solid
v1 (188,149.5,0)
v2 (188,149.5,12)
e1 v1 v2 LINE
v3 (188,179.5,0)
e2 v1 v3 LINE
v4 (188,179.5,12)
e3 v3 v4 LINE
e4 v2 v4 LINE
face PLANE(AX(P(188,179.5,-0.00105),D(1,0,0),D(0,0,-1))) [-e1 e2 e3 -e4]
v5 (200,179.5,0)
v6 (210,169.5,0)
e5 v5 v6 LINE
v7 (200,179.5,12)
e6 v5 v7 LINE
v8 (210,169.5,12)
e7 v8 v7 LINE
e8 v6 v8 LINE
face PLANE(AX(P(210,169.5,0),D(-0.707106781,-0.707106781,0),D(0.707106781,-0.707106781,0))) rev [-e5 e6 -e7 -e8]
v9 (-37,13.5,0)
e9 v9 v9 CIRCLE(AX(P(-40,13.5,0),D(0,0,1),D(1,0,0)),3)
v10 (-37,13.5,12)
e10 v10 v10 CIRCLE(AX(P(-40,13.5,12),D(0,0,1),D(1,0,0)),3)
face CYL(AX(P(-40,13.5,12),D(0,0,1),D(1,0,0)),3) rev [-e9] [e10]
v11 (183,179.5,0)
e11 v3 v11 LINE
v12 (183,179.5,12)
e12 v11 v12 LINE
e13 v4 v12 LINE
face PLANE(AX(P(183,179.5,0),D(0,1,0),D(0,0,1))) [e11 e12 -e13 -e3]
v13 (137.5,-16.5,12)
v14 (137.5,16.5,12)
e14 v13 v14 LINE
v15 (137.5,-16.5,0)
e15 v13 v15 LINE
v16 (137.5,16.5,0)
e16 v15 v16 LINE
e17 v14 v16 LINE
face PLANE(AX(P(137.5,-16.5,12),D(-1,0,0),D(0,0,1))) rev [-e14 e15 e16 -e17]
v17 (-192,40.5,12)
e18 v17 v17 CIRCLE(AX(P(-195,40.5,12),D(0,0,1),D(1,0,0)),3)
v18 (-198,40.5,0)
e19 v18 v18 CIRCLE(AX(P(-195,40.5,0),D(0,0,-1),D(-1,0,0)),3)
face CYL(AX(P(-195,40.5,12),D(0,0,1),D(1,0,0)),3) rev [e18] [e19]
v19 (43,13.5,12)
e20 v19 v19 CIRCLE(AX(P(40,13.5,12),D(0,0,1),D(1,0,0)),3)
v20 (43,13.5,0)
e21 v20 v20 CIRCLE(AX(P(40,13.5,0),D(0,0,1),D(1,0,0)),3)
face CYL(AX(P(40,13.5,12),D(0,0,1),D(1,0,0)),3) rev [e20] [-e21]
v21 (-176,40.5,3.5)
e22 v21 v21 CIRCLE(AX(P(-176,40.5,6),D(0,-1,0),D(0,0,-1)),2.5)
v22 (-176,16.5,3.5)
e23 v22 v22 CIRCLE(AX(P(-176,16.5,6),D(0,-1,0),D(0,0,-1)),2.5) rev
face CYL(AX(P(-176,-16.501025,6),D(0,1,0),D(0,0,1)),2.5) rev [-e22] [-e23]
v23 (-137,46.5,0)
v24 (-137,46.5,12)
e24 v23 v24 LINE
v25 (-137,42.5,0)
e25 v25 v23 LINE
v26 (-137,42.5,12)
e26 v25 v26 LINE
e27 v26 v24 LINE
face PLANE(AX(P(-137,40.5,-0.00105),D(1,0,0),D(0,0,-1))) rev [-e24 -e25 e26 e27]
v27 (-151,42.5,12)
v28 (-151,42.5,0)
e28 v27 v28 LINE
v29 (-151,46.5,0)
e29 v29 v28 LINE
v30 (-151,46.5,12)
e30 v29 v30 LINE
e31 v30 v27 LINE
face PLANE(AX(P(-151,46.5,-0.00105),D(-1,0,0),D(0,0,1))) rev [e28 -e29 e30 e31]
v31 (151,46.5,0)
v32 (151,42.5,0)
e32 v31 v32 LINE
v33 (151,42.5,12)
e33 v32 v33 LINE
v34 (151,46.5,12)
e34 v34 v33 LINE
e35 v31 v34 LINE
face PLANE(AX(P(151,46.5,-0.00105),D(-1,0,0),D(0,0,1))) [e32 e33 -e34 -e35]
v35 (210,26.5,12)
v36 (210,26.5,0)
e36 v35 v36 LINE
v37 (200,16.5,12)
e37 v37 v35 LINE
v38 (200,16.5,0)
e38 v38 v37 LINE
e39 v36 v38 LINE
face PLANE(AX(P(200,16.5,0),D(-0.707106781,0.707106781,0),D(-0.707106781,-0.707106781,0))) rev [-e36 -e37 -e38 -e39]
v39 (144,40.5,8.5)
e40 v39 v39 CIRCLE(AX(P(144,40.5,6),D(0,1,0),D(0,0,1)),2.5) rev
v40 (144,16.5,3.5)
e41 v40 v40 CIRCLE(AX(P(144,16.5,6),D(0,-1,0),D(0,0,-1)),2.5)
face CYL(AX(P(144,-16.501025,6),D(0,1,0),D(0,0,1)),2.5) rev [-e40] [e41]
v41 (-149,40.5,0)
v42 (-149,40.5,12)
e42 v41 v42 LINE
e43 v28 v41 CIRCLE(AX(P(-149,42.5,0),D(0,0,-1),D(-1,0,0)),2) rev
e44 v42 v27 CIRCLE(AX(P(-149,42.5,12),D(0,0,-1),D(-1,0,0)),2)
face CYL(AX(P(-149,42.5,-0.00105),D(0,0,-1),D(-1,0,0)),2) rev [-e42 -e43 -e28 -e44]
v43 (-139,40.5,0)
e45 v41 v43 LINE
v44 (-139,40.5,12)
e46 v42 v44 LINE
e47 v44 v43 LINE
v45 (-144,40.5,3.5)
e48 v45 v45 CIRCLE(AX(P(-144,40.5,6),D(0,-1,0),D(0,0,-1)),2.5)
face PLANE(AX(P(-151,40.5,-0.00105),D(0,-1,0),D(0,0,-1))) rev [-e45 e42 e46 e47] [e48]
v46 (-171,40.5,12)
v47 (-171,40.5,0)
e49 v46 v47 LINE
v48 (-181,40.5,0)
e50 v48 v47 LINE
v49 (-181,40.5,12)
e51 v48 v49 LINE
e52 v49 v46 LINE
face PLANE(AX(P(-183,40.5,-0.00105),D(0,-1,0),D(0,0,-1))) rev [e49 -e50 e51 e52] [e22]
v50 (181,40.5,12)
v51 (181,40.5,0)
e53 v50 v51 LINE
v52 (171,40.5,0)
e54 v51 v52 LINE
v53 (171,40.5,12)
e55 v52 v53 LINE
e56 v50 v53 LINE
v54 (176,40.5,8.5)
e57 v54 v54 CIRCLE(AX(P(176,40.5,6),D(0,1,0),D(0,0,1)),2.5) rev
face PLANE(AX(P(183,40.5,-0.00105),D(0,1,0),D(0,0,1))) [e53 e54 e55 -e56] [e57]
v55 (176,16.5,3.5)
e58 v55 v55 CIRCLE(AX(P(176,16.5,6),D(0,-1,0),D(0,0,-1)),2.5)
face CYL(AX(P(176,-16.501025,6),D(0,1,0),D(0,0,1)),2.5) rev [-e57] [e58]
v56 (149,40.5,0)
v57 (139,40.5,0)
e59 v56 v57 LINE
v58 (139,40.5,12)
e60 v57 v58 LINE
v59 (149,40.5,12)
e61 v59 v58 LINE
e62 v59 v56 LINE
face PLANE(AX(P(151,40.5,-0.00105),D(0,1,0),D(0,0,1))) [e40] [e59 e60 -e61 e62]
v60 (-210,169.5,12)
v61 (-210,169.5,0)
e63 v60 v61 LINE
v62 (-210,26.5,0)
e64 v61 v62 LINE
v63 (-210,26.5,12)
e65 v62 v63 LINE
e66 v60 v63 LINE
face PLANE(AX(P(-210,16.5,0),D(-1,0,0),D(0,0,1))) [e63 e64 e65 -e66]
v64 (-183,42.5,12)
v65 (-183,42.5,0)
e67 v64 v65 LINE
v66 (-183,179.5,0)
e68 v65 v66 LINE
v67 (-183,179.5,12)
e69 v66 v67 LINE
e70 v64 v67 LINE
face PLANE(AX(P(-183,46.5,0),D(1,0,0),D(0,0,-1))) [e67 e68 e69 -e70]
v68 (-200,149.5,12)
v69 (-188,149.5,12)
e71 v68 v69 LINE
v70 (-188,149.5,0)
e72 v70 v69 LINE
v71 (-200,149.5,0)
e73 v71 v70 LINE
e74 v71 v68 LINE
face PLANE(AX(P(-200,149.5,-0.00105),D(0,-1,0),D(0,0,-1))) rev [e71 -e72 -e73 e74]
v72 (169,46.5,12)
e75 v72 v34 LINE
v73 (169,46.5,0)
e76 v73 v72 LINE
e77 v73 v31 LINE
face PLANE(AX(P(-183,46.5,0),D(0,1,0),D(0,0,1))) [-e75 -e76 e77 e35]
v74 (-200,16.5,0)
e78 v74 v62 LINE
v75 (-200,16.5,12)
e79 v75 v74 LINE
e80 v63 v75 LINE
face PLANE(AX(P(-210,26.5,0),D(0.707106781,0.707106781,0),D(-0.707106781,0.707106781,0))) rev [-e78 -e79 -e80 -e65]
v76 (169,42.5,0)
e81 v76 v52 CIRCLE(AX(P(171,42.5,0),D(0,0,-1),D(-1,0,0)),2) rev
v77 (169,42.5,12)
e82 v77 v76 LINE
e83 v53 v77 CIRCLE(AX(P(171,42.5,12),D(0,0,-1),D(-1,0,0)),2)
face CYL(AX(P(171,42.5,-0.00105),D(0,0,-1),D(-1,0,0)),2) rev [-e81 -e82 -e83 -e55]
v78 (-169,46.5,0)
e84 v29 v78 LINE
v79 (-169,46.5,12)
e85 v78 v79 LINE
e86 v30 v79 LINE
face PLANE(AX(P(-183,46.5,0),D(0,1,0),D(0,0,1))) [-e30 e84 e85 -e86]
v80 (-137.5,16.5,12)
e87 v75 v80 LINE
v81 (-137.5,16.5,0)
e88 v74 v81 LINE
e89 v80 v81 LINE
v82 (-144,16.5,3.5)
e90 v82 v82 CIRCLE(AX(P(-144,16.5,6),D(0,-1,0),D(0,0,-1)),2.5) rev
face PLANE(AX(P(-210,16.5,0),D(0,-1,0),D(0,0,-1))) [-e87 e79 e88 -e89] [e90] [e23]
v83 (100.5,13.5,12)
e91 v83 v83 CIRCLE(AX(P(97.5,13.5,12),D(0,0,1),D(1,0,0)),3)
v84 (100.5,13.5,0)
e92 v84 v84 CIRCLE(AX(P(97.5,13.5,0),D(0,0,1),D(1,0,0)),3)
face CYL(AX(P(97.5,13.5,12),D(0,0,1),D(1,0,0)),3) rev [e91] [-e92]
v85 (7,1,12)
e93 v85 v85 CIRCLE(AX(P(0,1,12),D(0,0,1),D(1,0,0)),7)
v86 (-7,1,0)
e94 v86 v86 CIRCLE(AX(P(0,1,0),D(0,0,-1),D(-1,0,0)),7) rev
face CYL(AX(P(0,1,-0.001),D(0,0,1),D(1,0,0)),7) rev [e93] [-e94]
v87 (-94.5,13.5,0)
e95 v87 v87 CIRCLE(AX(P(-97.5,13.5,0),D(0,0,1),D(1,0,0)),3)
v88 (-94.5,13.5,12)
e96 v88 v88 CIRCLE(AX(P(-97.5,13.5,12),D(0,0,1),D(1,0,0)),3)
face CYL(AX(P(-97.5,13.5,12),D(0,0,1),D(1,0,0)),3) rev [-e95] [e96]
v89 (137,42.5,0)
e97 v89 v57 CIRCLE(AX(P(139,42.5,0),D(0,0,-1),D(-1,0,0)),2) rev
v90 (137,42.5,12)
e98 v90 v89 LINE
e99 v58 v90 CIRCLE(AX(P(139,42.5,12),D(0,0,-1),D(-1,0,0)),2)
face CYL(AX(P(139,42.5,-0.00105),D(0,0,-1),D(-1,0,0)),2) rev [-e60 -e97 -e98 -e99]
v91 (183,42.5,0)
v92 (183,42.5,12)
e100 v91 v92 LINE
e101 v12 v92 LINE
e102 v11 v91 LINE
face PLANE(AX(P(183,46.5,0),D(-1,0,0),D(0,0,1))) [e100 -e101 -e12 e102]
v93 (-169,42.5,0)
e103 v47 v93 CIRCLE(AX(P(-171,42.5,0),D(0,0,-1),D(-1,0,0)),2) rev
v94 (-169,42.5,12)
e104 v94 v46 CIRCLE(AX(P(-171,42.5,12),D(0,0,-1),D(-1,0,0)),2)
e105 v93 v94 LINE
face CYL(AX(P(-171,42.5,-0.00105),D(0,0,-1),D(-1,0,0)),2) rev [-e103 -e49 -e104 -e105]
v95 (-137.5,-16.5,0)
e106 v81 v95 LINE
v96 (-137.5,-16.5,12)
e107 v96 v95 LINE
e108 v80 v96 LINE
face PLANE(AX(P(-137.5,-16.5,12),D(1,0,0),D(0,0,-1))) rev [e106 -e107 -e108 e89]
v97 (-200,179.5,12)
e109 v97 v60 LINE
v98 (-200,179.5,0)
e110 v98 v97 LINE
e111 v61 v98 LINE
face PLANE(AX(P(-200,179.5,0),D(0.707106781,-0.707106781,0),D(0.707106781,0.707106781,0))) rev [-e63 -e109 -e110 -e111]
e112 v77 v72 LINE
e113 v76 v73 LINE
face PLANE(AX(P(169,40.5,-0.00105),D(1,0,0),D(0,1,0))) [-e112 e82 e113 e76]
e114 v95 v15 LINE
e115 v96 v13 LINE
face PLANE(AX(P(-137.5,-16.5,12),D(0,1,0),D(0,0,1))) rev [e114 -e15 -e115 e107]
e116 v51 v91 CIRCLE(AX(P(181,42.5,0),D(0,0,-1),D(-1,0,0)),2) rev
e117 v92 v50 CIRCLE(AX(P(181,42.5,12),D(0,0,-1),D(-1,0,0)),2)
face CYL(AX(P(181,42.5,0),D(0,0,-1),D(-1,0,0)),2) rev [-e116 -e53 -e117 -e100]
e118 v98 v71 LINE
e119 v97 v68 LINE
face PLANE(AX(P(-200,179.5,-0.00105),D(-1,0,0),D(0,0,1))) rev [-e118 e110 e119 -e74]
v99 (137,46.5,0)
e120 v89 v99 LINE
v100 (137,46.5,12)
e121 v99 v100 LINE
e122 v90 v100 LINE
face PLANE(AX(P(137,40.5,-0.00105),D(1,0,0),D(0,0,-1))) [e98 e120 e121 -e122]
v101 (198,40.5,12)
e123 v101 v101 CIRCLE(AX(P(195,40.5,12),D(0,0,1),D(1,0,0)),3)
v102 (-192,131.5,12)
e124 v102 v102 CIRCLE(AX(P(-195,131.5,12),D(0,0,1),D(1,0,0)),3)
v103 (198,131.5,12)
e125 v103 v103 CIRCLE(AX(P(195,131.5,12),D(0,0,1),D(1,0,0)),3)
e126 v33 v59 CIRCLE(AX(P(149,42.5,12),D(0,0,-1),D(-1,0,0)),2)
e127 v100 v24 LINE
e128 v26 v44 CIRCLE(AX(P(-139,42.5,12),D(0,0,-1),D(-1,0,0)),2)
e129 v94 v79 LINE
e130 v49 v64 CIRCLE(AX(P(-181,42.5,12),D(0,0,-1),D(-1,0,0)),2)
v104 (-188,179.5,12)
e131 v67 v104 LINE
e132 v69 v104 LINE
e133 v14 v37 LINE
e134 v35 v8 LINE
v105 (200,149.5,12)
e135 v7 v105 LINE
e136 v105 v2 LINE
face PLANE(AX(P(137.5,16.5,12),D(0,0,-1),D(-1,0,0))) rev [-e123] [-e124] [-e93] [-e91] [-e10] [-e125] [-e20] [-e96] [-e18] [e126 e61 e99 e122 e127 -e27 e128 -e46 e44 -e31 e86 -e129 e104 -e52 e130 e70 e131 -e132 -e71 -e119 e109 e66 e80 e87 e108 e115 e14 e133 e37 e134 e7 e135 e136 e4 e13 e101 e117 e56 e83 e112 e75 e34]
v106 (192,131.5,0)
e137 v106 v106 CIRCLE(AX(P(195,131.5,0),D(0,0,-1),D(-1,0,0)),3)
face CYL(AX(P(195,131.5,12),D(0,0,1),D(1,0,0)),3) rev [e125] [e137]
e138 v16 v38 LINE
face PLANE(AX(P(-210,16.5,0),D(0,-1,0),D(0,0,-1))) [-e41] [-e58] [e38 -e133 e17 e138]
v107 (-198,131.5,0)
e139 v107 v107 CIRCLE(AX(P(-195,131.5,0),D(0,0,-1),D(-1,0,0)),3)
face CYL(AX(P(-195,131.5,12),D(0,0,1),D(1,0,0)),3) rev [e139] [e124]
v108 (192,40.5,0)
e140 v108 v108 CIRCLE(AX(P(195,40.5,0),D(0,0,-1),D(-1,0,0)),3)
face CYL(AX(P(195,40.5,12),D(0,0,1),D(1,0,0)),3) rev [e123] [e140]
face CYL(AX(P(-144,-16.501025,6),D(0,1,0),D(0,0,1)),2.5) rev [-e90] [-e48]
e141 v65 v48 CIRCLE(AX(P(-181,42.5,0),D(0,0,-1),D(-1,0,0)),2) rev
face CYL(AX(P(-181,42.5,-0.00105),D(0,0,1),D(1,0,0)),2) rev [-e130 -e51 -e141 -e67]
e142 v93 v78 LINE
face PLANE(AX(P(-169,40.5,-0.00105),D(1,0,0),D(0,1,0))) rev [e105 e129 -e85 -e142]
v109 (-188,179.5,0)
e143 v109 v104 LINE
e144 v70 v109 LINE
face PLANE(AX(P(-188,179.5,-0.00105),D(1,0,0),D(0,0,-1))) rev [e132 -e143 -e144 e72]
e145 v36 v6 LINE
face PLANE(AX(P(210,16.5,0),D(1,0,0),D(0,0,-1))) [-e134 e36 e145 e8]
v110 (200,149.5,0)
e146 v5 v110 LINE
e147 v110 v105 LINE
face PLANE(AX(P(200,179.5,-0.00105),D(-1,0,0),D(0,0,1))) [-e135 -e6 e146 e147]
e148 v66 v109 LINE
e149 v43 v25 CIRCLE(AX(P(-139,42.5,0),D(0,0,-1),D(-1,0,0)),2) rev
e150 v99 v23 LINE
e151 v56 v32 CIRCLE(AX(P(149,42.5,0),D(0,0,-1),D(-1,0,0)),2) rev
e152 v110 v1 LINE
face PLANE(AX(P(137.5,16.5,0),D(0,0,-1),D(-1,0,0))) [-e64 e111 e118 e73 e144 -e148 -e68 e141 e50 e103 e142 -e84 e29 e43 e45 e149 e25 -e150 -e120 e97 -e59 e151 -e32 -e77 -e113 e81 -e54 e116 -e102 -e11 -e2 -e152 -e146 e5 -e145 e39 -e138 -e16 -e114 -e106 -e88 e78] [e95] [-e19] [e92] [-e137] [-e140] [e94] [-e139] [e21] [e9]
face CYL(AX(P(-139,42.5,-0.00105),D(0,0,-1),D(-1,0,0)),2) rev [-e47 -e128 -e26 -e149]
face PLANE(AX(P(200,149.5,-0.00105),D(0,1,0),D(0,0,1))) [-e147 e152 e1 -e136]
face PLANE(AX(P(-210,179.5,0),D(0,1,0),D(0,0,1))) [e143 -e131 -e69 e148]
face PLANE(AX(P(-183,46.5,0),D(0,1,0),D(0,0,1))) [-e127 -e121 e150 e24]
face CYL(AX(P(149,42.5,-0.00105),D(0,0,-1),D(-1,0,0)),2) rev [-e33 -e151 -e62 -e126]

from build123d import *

# Parameters (mm, degrees)
SKETCH1_W                    = 275
SKETCH1_H                    = 33
BOSS_EXTRUDE1_DEPTH          = 12
CUT_EXTRUDE1_REACH           = 141.005
SKETCH2_R                    = 7
BOSS_EXTRUDE2_DEPTH          = 12
CUT_EXTRUDE2_REACH           = 250.863
SKETCH4_R                    = 2.5
CUT_EXTRUDE3_REACH           = 278.522
SKETCH5_W                    = 14
SKETCH5_H                    = 6
FILLET1_R                    = 2
FILLET1_OF_MIRROR2_R         = 2
CHAMFER1_SIZE                = 10
CUT_EXTRUDE4_REACH           = 278.522
SKETCH6_W                    = 12
SKETCH6_H                    = 30
CHAMFER2_SIZE                = 10
F_6_0_6_DIAMETER_HOLE1_D     = 6
F_6_0_6_DIAMETER_HOLE2_D     = 6
F_6_0_6_DIAMETER_HOLE2_DEPTH = 12
F_6_0_6_DIAMETER_HOLE2_TIP   = 1.802581857


with BuildPart() as part:
    # Sketch1 → Boss-Extrude1 (new body)
    with BuildSketch(Plane.XY):
        Rectangle(SKETCH1_W, SKETCH1_H)
    extrude(amount=BOSS_EXTRUDE1_DEPTH)

    # Sketch2 → Cut-Extrude1 (cut, up to next)
    with BuildSketch(Plane.XY.offset(12), mode=Mode.PRIVATE) as cut_extrude1_sk1:
        with Locations((0, 1)):
            Circle(SKETCH2_R)
    cut_extrude1_tool1 = extrude(cut_extrude1_sk1.sketch, amount=-CUT_EXTRUDE1_REACH, mode=Mode.PRIVATE) & part.part
    add(cut_extrude1_tool1.solids().sort_by_distance((0, 1, 12))[0], mode=Mode.SUBTRACT)

    # Sketch3 → Boss-Extrude2 (add)
    with BuildSketch(Plane.XY.offset(12)):
        Polygon((-210, 16.5), (210, 16.5), (210, 179.5), (183, 179.5), (183, 46.5), (-183, 46.5), (-183, 179.5), (-210, 179.5), align=None)
    extrude(amount=-BOSS_EXTRUDE2_DEPTH)

    # Sketch4 → Cut-Extrude2 (cut, up to next)
    with BuildSketch(Plane(origin=(0, 46.5, 0), x_dir=(1, 0, 0), z_dir=(0, 1, 0)), mode=Mode.PRIVATE) as cut_extrude2_sk1:
        with Locations(Location((-144, -6, 0), (0, 0, 270))):
            Circle(SKETCH4_R)
    cut_extrude2_tool1 = extrude(cut_extrude2_sk1.sketch, amount=-CUT_EXTRUDE2_REACH, mode=Mode.PRIVATE) & part.part
    # Sketch4 → Cut-Extrude2 (cut, up to next)
    with BuildSketch(Plane(origin=(0, 46.5, 0), x_dir=(1, 0, 0), z_dir=(0, 1, 0)), mode=Mode.PRIVATE) as cut_extrude2_sk2:
        with Locations(Location((-176, -6, 0), (0, 0, 270))):
            Circle(SKETCH4_R)
    cut_extrude2_tool2 = extrude(cut_extrude2_sk2.sketch, amount=-CUT_EXTRUDE2_REACH, mode=Mode.PRIVATE) & part.part
    cut_extrude2_1 = cut_extrude2_tool1.solids().sort_by_distance((-144, 46.5, 6))[0]
    add(cut_extrude2_1, mode=Mode.SUBTRACT)
    cut_extrude2_2 = cut_extrude2_tool2.solids().sort_by_distance((-176, 46.5, 6))[0]
    add(cut_extrude2_2, mode=Mode.SUBTRACT)
    cut_extrude2 = cut_extrude2_1 + cut_extrude2_2  # Cut-Extrude2 as one shape, for the pattern or mirror that repeats it

    # Mirror1: Cut-Extrude2 across plane
    add(cut_extrude2.mirror(Plane(origin=(0, 0, 0), x_dir=(0, 0, 1), z_dir=(1, 0, 0))), mode=Mode.SUBTRACT)

    # Sketch5 → Cut-Extrude3 (cut, up to next)
    with BuildSketch(Plane.XY.offset(12), mode=Mode.PRIVATE) as cut_extrude3_sk1:
        with Locations((-176, 43.5)):
            Rectangle(SKETCH5_W, SKETCH5_H)
    cut_extrude3_tool1 = extrude(cut_extrude3_sk1.sketch, amount=-CUT_EXTRUDE3_REACH, mode=Mode.PRIVATE) & part.part
    # Sketch5 → Cut-Extrude3 (cut, up to next)
    with BuildSketch(Plane.XY.offset(12), mode=Mode.PRIVATE) as cut_extrude3_sk2:
        with Locations((-144, 43.5)):
            Rectangle(SKETCH5_W, SKETCH5_H)
    cut_extrude3_tool2 = extrude(cut_extrude3_sk2.sketch, amount=-CUT_EXTRUDE3_REACH, mode=Mode.PRIVATE) & part.part
    cut_extrude3_1 = cut_extrude3_tool1.solids().sort_by_distance((-176, 43.5, 12))[0]
    add(cut_extrude3_1, mode=Mode.SUBTRACT)
    cut_extrude3_2 = cut_extrude3_tool2.solids().sort_by_distance((-144, 43.5, 12))[0]
    add(cut_extrude3_2, mode=Mode.SUBTRACT)
    cut_extrude3 = cut_extrude3_1 + cut_extrude3_2  # Cut-Extrude3 as one shape, for the pattern or mirror that repeats it

    # Fillet1
    fillet1_edges = [part.edges().sort_by_distance(p)[0] for p in [
        (-169, 40.5, 6),
        (-183, 40.5, 6),
        (-137, 40.5, 6),
        (-151, 40.5, 6),
    ]]
    fillet(fillet1_edges, radius=FILLET1_R)

    # Mirror2: Cut-Extrude3 across plane
    add(cut_extrude3.mirror(Plane(origin=(0, 0, 0), x_dir=(0, 0, 1), z_dir=(1, 0, 0))), mode=Mode.SUBTRACT)

    # Fillet1 of Mirror2
    fillet1_of_mirror2_edges = [part.edges().sort_by_distance(p)[0] for p in [
        (169, 40.5, 6),
        (183, 40.5, 6),
        (137, 40.5, 6),
        (151, 40.5, 6),
    ]]
    fillet(fillet1_of_mirror2_edges, radius=FILLET1_OF_MIRROR2_R)

    # Chamfer1
    chamfer1_edges = [part.edges().sort_by_distance(p)[0] for p in [
        (210, 16.5, 6),
        (-210, 16.5, 6),
    ]]
    chamfer(chamfer1_edges, length=CHAMFER1_SIZE)

    # Sketch6 → Cut-Extrude4 (cut, up to next)
    with BuildSketch(Plane.XY.offset(12), mode=Mode.PRIVATE) as cut_extrude4_sk1:
        with Locations((-194, 164.5)):
            Rectangle(SKETCH6_W, SKETCH6_H)
    cut_extrude4_tool1 = extrude(cut_extrude4_sk1.sketch, amount=-CUT_EXTRUDE4_REACH, mode=Mode.PRIVATE) & part.part
    cut_extrude4 = cut_extrude4_tool1.solids().sort_by_distance((-194, 164.5, 12))[0]
    add(cut_extrude4, mode=Mode.SUBTRACT)

    # Mirror3: Cut-Extrude4 across plane
    add(cut_extrude4.mirror(Plane(origin=(0, 0, 0), x_dir=(0, 0, 1), z_dir=(1, 0, 0))), mode=Mode.SUBTRACT)

    # Chamfer2
    chamfer2_edges = [part.edges().sort_by_distance(p)[0] for p in [
        (210, 179.5, 6),
        (-210, 179.5, 6),
    ]]
    chamfer(chamfer2_edges, length=CHAMFER2_SIZE - 0.0001)  # a hair under: the kernel refuses the full size

    # Ø6.0 (6) Diameter Hole1 (through all)
    with Locations(Plane.XY.offset(12)):
        with Locations((-195, 40.5), (-195, 131.5)):
            f_6_0_6_diameter_hole1 = Hole(F_6_0_6_DIAMETER_HOLE1_D / 2)

    # Mirror4: Ø6.0 (6) Diameter Hole1 across plane
    add(f_6_0_6_diameter_hole1.mirror(Plane(origin=(0, 0, 0), x_dir=(0, 0, 1), z_dir=(1, 0, 0))), mode=Mode.SUBTRACT)

    # Ø6.0 (6) Diameter Hole2
    with Locations(Plane.XY.offset(12)):
        with Locations((-97.5, 13.5), (-40, 13.5), (40, 13.5), (97.5, 13.5)):
            Hole(F_6_0_6_DIAMETER_HOLE2_D / 2, depth=F_6_0_6_DIAMETER_HOLE2_DEPTH)
            with Locations((0, 0, -(F_6_0_6_DIAMETER_HOLE2_DEPTH + F_6_0_6_DIAMETER_HOLE2_TIP / 2))):  # 118° drill point
                Cone(0, F_6_0_6_DIAMETER_HOLE2_D / 2, F_6_0_6_DIAMETER_HOLE2_TIP, mode=Mode.SUBTRACT)


solid = part.part
